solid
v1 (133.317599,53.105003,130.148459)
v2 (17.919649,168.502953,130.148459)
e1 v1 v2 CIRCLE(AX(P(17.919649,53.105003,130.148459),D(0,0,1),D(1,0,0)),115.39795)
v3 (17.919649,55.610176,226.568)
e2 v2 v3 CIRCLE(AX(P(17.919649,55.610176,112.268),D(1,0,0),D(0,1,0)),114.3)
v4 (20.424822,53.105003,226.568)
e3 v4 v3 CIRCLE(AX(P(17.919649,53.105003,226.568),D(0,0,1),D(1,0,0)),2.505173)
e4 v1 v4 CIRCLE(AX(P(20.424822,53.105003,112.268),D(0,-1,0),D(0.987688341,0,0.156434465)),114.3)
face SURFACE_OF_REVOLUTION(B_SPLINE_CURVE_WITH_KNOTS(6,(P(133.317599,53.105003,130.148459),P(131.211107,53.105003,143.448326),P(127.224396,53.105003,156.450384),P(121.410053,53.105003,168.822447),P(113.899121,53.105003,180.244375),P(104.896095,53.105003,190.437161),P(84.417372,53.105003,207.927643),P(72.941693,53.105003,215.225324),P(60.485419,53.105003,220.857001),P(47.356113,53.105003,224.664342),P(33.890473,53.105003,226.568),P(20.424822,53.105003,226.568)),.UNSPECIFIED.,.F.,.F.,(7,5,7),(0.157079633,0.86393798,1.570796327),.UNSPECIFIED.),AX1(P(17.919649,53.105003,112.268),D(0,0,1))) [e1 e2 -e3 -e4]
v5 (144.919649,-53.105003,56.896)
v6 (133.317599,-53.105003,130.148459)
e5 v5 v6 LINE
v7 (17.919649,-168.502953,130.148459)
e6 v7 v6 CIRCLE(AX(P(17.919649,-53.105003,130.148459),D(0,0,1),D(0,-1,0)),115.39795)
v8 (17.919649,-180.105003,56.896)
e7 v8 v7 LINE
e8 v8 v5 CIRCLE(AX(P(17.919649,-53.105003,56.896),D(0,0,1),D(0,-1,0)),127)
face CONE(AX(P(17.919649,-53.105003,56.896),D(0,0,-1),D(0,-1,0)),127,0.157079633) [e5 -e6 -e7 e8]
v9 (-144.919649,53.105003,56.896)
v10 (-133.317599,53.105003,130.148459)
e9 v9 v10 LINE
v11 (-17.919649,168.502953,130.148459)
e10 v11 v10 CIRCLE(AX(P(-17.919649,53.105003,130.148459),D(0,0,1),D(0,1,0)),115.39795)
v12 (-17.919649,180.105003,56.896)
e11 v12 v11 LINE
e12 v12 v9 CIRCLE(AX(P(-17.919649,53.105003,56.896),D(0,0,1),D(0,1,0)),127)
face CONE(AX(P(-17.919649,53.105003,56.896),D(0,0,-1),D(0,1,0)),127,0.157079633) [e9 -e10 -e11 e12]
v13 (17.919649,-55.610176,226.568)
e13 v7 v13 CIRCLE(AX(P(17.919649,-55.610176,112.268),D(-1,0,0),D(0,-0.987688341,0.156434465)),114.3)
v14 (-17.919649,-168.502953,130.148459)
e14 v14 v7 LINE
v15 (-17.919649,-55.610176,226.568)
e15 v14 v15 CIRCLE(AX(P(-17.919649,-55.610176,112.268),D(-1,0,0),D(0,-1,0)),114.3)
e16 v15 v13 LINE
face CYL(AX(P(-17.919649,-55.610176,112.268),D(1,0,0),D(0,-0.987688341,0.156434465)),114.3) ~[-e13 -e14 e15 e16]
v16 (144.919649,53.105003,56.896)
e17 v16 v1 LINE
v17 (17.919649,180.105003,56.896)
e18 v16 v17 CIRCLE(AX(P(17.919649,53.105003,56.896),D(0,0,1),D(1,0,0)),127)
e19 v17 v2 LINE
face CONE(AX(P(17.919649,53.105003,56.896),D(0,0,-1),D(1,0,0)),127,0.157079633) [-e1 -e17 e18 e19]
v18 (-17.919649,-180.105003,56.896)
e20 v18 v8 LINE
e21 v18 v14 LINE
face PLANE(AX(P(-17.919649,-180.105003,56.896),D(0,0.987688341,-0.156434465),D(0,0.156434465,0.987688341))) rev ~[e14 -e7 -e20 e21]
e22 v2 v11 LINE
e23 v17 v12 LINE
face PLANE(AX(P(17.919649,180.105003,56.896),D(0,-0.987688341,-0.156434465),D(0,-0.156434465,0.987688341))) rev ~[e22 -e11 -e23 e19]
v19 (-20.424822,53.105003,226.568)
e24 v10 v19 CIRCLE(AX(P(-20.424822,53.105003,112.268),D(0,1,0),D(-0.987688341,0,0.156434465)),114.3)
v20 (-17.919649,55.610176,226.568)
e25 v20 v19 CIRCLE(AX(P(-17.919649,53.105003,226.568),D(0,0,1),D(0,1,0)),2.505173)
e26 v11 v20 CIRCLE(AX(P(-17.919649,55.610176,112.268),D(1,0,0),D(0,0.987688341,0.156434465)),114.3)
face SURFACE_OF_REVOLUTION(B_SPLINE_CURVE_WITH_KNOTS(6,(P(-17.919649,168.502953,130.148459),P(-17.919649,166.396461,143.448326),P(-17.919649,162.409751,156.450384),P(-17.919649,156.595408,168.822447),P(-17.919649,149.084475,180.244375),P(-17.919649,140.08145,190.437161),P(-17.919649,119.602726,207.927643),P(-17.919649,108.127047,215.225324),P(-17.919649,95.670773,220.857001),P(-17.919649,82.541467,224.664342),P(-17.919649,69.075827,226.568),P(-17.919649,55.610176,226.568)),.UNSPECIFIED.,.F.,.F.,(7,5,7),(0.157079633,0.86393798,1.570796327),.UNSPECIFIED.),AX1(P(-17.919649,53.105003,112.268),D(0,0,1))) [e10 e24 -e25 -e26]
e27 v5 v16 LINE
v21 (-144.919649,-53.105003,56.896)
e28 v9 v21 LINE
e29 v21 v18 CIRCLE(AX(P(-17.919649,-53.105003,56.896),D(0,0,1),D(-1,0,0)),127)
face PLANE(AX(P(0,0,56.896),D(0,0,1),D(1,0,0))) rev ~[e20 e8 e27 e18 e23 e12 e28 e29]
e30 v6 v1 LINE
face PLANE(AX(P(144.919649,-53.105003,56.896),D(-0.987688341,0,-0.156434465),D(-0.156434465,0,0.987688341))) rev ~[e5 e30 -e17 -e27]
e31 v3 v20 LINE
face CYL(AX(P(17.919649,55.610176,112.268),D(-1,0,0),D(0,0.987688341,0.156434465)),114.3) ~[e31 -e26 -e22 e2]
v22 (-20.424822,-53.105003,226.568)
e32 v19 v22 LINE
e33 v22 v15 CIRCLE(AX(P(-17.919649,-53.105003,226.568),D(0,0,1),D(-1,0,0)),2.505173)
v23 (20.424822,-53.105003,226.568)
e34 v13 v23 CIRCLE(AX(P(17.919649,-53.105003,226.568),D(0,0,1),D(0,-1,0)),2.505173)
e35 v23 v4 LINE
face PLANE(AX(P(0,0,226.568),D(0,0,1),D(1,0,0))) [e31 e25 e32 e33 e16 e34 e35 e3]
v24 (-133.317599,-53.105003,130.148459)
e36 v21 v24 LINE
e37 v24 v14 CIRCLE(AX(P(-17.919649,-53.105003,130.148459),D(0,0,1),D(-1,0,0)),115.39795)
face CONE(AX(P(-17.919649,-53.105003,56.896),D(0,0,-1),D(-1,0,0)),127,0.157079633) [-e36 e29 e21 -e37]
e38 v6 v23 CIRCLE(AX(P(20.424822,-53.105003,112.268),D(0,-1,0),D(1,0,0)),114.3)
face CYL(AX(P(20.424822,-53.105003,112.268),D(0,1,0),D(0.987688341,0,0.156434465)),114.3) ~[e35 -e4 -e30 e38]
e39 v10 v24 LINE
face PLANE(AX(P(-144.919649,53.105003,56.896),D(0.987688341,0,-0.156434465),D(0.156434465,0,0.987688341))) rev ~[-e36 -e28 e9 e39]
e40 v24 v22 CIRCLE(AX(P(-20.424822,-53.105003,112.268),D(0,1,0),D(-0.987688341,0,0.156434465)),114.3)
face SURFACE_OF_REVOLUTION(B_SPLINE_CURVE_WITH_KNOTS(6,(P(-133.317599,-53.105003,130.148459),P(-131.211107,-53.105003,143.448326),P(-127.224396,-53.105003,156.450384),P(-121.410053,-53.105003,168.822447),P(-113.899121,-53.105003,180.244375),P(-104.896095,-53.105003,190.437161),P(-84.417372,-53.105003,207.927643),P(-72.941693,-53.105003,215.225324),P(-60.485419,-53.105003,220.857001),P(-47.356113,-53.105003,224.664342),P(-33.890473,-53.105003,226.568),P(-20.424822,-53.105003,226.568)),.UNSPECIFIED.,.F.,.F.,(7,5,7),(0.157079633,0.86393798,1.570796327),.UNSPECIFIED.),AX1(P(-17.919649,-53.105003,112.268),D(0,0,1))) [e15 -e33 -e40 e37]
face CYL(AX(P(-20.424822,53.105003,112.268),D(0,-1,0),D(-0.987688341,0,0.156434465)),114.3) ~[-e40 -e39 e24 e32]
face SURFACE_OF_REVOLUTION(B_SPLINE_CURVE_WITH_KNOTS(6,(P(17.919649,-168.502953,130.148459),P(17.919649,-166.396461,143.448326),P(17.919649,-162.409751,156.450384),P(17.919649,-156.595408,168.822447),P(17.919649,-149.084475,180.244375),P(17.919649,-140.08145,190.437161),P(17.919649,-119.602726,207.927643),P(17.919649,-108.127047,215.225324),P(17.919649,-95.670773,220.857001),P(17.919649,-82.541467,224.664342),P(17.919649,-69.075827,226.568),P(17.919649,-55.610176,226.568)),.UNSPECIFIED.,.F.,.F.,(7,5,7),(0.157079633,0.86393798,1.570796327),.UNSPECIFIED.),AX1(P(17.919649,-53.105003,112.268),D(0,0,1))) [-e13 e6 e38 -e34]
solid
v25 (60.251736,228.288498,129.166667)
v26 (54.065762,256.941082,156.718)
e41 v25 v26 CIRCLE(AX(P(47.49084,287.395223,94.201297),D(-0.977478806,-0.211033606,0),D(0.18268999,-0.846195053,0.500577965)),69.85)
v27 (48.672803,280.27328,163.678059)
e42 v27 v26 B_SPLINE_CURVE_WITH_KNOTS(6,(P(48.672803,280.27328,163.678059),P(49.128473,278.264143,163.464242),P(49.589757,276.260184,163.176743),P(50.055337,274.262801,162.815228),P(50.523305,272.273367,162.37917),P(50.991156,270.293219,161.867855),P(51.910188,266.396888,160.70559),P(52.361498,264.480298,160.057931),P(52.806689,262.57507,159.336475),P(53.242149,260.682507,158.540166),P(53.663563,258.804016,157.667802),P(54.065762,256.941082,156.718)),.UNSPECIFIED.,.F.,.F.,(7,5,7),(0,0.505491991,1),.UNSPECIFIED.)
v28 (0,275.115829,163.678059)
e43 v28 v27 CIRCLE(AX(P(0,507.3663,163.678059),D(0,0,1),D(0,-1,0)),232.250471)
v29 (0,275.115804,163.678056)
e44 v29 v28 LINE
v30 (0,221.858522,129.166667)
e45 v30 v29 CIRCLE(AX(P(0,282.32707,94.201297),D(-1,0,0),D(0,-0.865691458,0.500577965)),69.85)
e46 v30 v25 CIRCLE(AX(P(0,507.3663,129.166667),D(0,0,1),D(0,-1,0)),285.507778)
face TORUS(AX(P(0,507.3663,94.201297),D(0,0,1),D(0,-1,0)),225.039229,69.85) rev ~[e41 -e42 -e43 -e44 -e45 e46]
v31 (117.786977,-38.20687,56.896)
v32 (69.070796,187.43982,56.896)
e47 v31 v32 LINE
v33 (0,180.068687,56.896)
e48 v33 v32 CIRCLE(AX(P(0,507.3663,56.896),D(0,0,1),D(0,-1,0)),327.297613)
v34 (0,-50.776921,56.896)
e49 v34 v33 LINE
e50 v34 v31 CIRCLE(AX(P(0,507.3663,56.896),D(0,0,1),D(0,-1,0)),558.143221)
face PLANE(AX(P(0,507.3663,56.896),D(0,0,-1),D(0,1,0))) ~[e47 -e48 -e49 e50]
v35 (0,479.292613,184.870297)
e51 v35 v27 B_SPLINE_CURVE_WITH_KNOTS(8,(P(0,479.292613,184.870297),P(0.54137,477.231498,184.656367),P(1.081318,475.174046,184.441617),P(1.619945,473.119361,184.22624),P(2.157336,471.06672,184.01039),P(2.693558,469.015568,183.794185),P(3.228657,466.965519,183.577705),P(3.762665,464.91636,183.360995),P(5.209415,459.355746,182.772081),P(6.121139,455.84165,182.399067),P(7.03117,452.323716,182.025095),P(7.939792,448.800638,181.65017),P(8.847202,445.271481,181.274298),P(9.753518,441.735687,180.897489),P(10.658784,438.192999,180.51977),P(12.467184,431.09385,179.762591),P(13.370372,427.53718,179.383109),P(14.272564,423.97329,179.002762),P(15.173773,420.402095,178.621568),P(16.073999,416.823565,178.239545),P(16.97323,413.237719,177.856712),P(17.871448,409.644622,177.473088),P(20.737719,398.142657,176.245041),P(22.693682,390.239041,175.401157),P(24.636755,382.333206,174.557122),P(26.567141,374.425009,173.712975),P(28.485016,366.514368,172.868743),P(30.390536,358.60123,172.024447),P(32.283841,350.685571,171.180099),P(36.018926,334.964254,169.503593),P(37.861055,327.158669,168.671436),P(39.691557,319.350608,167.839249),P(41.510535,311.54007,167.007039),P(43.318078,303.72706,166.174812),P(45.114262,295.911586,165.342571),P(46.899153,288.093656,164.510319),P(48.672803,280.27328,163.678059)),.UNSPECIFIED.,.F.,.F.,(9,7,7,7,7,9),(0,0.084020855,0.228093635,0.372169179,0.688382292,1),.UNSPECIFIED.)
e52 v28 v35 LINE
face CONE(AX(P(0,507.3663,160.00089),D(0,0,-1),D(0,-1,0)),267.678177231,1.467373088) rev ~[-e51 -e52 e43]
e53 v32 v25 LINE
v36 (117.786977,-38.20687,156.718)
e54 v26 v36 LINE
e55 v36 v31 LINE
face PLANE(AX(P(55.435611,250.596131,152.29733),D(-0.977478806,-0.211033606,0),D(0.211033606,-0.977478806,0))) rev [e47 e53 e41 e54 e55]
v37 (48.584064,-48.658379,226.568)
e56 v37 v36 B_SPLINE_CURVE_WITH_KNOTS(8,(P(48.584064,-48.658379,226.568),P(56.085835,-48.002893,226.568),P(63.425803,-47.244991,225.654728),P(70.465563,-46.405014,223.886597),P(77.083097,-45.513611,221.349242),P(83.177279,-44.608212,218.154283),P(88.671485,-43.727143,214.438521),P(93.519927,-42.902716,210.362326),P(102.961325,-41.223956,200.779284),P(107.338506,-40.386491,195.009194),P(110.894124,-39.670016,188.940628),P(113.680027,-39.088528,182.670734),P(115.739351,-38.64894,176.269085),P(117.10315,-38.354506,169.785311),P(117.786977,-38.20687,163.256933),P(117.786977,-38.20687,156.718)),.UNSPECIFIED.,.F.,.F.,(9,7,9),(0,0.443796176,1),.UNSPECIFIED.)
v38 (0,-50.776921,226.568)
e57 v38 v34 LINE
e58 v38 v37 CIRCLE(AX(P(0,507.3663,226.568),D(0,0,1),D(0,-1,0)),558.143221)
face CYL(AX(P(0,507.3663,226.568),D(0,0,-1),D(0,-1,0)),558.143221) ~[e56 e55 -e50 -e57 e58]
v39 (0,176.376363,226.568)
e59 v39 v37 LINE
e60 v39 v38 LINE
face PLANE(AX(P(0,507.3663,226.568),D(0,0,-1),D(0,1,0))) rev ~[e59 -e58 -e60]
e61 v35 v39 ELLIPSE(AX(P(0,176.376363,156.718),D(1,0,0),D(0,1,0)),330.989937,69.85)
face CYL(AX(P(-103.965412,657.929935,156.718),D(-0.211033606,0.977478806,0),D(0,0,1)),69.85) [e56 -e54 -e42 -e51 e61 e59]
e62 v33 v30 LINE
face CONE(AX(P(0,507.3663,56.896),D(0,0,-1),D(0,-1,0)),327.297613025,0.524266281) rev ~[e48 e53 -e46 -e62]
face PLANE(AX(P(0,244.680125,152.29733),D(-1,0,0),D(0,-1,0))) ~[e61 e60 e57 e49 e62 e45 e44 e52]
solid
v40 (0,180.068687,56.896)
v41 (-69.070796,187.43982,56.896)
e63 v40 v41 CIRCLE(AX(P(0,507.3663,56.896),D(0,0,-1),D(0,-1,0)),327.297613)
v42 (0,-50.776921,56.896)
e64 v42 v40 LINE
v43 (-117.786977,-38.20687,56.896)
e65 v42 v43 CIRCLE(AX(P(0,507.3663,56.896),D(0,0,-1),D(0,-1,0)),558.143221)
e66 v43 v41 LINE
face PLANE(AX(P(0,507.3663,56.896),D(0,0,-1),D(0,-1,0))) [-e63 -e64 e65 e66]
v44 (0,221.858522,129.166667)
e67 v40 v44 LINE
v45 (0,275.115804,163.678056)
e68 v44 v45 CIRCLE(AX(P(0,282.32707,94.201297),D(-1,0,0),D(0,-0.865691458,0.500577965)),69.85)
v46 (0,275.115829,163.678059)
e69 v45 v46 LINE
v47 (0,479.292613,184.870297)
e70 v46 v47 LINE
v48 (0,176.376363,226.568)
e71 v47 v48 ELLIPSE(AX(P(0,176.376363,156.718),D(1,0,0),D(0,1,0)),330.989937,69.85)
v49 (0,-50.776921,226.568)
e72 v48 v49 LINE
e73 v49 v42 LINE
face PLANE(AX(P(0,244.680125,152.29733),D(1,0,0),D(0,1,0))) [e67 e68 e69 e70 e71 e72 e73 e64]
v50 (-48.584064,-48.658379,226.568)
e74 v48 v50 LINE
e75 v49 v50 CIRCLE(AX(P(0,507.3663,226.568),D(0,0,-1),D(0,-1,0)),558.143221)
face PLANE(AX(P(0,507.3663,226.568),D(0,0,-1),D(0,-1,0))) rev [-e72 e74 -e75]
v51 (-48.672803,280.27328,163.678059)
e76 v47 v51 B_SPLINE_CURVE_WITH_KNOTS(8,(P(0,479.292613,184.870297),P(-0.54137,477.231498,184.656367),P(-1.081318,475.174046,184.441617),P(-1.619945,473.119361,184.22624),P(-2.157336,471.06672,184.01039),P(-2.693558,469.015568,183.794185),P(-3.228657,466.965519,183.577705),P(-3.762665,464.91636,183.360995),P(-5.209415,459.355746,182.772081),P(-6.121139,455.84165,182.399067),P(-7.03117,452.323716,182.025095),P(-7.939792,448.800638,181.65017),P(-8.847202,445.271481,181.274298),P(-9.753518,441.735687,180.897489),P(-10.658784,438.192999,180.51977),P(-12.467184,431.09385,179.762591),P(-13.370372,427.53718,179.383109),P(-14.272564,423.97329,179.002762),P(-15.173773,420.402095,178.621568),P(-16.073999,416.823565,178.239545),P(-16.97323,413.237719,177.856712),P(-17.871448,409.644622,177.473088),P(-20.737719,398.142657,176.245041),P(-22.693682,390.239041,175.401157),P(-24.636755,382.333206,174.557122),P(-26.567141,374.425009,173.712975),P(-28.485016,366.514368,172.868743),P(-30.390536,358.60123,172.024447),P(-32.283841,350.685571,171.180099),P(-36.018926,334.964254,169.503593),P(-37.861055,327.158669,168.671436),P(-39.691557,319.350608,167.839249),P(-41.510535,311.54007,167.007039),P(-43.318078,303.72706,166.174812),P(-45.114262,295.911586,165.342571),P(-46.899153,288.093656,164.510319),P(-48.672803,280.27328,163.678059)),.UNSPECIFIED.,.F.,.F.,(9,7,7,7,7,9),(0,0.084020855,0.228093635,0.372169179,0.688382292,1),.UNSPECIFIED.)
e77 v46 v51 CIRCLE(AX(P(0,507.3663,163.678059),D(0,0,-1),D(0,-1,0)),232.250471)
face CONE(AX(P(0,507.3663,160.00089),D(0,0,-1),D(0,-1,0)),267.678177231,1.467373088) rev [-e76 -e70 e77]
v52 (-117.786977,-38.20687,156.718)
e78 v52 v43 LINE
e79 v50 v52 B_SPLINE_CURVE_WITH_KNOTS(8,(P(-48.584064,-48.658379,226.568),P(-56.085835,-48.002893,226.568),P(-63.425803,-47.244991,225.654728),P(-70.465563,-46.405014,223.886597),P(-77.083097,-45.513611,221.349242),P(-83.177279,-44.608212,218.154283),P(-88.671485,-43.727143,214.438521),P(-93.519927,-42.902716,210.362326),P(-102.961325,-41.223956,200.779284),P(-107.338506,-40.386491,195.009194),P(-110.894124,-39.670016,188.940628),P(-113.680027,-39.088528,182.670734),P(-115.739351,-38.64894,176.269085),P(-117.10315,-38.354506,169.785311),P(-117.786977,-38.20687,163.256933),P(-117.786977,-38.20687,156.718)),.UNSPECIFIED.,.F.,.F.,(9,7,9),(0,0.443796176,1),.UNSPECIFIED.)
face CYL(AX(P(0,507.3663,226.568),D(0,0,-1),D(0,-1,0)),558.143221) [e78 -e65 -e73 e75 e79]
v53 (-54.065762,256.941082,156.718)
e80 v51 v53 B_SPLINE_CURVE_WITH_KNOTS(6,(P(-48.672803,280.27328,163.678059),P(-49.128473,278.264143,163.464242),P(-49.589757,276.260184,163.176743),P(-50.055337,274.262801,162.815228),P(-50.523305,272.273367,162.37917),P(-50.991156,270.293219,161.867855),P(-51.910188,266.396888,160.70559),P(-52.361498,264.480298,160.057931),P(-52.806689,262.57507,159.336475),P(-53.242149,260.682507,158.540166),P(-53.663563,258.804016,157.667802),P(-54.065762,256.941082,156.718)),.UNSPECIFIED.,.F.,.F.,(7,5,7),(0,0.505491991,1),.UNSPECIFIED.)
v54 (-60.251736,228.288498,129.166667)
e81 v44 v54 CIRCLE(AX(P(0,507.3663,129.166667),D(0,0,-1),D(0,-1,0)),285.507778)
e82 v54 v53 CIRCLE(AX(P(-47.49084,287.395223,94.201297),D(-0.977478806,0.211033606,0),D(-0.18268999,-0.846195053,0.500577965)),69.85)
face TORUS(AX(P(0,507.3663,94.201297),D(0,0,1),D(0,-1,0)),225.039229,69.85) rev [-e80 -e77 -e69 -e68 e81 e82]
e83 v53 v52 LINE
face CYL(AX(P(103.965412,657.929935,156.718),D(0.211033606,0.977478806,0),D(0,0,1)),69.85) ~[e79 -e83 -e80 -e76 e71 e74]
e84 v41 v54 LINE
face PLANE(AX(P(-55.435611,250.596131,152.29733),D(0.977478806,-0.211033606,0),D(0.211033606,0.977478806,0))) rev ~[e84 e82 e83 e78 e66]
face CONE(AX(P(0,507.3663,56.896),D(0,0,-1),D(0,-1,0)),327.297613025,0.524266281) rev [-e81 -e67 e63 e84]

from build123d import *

# Parameters (mm, degrees)
F2_DEPTH    = 169.672
F2_TAPER    = 9
F3_R        = 114.3
F6_ANGLE    = 12.1829310863
F7_T2_ANGLE = 12.1829310863
F7_T6_DEPTH = 901.8811791581
F7_S7_R     = 558.1432208419
F7_T8_DEPTH = 470


# Not quite as in the source:
# - a fillet or chamfer that OpenCascade refuses, or shapes differently, is made with other operations: its cross-section is extruded or revolved along the edge and cut away or added


with BuildPart() as f2:
    # F1 (on offset) → F2 (new body)
    with BuildSketch(Plane.XY.offset(56.896)):
        with BuildLine():
            ThreePointArc((-144.9196487665, -53.105003047), (-107.7222099772, -142.9075642577), (-17.9196487665, -180.105003047))
            Line((-17.9196487665, -180.105003047), (0, -180.105003047))
            Line((0, -180.105003047), (17.9196487665, -180.105003047))
            ThreePointArc((17.9196487665, -180.105003047), (107.7222099772, -142.9075642577), (144.9196487665, -53.105003047))
            Line((144.9196487665, -53.105003047), (144.9196487665, 0))
            Line((144.9196487665, 0), (144.9196487665, 53.105003047))
            ThreePointArc((144.9196487665, 53.105003047), (107.7222099772, 142.9075642577), (17.9196487665, 180.105003047))
            Line((17.9196487665, 180.105003047), (0, 180.105003047))
            Line((0, 180.105003047), (-17.9196487665, 180.105003047))
            ThreePointArc((-17.9196487665, 180.105003047), (-107.7222099772, 142.9075642577), (-144.9196487665, 53.105003047))
            Line((-144.9196487665, 53.105003047), (-144.9196487665, 0))
            Line((-144.9196487665, 0), (-144.9196487665, -53.105003047))
        make_face()
    extrude(amount=F2_DEPTH, taper=F2_TAPER)

    # F3
    f3_edges = [f2.edges().sort_by_distance(p)[0] for p in [
        (-118.046244, 0, 226.568),
    ]]
    fillet(f3_edges, radius=F3_R)


with BuildPart() as f6:
    # F4 (on Right) → F6 (revolve)
    with BuildSketch(Plane.YZ):
        Polygon((-50.7769212127, 226.568), (-50.7769212127, 141.7786058209), (-50.7769212127, 56.896), (180.0686866045, 56.896), (239.6881223982, 160.0008904934), (505.895614624, 187.6315176487), (501.8542579455, 226.568), align=None)
    revolve(axis=Axis((0, 507.3662996292, 211.7486968637), (0, 0, -1)), revolution_arc=F6_ANGLE)

    # F7: fillet of radius 69.85 on 2 edges, made by hand

    # F7_s1 → F7_t2 (revolve)
    with BuildSketch(Plane.YZ):
        with BuildLine():
            ThreePointArc((221.8585221218, 129.1666673988), (244.3415795247, 152.8197661139), (275.1158289732, 163.6780587923))
            Line((275.1158289732, 163.6780587923), (274.9716041433, 165.0675940378))
            Line((274.9716041433, 165.0675940378), (238.8353434367, 161.3168823729))
            Line((238.8353434367, 161.3168823729), (220.6491511548, 129.8659748164))
            Line((220.6491511548, 129.8659748164), (221.8585221218, 129.1666673988))
        make_face()
    revolve(axis=Axis((0, 507.3662996292, 160.0008904934), (0, 0, -1)), revolution_arc=F7_T2_ANGLE)


with BuildPart() as f7_tool4:
    # F7_s5 → F7_t6 (new body)
    with BuildSketch(Plane(origin=(140.3484830453, 650.074981269, 0), x_dir=(0, 0, 1), z_dir=(-0.2110336063, -0.9774788064, 0))):
        with BuildLine():
            ThreePointArc((226.568, 37.2213399469), (206.1094086659, 86.6127486127), (156.718, 107.0713399469))
            Line((156.718, 107.0713399469), (156.718, 108.4683399469))
            Line((156.718, 108.4683399469), (227.965, 108.4683399469))
            Line((227.965, 108.4683399469), (227.965, 37.2213399469))
            Line((227.965, 37.2213399469), (226.568, 37.2213399469))
        make_face()
    extrude(amount=F7_T6_DEPTH)

    # F7_s7 → F7_t8 (intersect, symmetric)
    with BuildSketch(Plane.XY.offset(192.3)):
        with Locations((0, 507.3662996292)):
            Circle(F7_S7_R)
    extrude(amount=F7_T8_DEPTH, both=True, mode=Mode.INTERSECT)


with BuildPart() as f6_1:
    add(f6.part)

    # F7_t3: cut F7_tool4
    add(f7_tool4.part, mode=Mode.SUBTRACT)


with BuildPart() as f8_1:
    # F8: instance of F6
    add(f6_1.part.mirror(Plane.YZ))


solid = Compound([f2.part, f6_1.part, f8_1.part])
